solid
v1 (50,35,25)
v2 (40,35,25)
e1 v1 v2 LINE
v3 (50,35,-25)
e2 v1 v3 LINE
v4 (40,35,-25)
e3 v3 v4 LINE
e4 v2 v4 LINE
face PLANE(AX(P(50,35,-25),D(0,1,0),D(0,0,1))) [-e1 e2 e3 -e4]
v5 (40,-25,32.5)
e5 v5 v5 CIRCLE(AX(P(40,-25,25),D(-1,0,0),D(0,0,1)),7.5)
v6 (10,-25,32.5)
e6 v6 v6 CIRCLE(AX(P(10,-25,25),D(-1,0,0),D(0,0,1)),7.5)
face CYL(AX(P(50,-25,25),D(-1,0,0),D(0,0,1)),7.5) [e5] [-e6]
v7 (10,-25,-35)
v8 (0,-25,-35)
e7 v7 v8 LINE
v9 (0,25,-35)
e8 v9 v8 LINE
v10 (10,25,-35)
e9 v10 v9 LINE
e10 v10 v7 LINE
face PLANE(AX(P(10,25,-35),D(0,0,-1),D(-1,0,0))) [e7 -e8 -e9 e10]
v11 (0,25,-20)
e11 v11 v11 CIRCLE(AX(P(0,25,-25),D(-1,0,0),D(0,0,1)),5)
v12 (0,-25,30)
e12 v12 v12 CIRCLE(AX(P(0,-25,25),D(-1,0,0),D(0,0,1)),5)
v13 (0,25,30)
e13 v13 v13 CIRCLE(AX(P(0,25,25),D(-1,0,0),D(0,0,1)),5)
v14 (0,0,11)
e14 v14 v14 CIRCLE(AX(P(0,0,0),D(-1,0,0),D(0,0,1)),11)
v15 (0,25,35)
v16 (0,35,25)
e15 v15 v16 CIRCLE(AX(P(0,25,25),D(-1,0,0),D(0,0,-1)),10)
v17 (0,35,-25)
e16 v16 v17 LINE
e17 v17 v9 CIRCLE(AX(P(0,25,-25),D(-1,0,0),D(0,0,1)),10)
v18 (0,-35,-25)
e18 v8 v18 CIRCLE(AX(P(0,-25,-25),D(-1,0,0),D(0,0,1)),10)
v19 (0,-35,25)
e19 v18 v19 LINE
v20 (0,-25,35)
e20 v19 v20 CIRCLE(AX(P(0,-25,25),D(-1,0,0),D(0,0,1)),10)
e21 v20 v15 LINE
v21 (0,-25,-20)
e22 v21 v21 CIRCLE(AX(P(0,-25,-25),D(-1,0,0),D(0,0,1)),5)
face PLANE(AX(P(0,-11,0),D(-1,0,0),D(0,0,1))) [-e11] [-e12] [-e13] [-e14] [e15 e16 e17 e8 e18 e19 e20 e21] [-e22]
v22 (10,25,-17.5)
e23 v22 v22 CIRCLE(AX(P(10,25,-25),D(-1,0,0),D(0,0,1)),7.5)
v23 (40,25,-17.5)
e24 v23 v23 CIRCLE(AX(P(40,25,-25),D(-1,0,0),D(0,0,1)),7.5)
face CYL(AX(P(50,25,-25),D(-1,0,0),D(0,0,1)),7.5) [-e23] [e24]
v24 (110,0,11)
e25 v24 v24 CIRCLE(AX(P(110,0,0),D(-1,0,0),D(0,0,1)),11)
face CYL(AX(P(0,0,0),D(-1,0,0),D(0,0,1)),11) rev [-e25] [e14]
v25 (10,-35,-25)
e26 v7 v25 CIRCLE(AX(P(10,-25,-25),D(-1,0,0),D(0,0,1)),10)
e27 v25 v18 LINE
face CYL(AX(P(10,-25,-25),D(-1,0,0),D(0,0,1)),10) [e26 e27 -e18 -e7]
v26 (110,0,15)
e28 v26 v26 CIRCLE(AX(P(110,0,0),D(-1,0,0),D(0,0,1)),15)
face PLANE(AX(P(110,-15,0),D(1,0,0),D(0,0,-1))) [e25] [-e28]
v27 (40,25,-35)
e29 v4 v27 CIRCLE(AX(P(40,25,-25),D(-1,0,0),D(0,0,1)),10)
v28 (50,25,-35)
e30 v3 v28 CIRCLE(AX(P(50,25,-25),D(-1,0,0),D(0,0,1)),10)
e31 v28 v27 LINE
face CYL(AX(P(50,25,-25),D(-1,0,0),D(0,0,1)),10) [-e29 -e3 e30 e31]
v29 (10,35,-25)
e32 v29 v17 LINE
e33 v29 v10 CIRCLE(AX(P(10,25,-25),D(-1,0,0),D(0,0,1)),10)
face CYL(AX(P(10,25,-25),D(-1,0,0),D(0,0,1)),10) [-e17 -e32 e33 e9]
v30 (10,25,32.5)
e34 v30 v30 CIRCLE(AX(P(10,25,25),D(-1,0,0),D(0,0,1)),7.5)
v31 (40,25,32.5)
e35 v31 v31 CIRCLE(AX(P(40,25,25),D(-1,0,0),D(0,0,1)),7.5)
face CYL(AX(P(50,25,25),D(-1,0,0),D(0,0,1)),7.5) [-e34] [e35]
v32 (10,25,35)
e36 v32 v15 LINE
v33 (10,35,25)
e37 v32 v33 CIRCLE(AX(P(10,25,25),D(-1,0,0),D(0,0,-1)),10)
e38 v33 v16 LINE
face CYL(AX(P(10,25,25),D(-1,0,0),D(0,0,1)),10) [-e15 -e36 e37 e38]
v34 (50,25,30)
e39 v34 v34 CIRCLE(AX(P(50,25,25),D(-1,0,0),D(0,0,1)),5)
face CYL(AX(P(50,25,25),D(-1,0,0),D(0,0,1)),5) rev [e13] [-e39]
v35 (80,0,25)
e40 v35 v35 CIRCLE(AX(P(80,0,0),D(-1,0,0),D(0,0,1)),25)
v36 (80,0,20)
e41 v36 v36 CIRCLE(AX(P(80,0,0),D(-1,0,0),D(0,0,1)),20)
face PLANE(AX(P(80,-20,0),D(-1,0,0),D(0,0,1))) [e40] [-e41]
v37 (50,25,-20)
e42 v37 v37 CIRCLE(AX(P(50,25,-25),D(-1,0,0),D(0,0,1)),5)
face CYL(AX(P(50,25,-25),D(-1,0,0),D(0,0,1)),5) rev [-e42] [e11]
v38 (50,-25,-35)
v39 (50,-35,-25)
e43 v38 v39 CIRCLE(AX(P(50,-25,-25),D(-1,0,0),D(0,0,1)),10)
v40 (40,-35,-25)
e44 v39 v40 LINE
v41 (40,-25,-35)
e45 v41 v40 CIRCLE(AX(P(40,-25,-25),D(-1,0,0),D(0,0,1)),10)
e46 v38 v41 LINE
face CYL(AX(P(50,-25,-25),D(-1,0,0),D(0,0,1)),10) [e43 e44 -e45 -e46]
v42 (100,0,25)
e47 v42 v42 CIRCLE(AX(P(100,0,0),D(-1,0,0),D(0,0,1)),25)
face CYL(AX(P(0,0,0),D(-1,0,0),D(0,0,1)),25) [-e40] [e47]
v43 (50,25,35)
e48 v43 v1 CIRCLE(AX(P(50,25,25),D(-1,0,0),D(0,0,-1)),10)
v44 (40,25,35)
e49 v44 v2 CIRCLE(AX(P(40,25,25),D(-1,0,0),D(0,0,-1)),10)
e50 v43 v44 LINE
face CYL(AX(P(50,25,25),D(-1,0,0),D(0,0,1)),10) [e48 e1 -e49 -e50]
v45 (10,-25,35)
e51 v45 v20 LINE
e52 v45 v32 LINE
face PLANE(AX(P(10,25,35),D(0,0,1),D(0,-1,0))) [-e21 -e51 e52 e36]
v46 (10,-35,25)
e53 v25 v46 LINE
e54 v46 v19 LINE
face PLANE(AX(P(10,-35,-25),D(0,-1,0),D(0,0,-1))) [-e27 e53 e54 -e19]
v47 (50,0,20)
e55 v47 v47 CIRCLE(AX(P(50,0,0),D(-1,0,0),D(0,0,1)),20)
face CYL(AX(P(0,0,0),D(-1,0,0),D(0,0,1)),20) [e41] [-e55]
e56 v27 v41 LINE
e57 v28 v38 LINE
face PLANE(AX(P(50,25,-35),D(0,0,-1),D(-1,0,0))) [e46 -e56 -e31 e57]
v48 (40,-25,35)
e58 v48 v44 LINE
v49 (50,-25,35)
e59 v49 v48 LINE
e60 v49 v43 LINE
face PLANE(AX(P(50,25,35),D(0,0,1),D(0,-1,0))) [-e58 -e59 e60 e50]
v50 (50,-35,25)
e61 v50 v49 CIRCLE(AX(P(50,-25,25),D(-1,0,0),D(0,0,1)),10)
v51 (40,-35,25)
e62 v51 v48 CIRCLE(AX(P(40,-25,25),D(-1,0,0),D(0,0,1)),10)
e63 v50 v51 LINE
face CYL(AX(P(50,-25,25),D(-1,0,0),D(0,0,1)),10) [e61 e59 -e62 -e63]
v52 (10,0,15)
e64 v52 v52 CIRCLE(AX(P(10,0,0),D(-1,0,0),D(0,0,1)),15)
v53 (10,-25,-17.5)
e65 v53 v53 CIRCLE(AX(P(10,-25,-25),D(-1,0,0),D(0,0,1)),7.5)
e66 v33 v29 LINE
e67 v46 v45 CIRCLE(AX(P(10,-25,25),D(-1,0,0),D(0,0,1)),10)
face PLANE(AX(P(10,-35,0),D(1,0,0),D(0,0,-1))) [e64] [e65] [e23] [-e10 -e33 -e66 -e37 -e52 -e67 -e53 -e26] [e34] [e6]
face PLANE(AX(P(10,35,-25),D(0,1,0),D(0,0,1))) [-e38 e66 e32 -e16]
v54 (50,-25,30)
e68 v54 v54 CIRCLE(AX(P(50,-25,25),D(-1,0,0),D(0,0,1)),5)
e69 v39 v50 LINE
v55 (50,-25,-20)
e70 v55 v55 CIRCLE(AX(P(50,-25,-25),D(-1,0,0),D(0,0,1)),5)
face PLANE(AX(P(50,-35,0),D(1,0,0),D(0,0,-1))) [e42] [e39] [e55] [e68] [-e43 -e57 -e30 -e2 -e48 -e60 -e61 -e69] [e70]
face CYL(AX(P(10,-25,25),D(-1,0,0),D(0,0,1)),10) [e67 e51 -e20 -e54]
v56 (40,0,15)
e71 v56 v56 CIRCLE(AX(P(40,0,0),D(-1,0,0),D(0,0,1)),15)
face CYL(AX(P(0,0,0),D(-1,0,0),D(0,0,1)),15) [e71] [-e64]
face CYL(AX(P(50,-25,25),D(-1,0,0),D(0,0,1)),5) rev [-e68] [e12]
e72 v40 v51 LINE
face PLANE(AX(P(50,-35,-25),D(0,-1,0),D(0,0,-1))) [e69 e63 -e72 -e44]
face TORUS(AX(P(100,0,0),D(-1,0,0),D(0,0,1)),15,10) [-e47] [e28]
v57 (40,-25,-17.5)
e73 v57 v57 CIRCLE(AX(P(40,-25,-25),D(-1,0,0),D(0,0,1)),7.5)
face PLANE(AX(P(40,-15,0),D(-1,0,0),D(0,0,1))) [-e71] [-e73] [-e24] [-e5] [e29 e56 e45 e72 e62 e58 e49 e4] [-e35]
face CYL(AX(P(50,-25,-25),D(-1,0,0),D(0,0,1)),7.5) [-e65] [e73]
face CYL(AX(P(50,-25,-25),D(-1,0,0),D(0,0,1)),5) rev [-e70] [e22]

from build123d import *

# Parameters (mm, degrees)
SKETCH_2_R               = 7.5
EXTRUDE_1_DEPTH          = 10
EXTRUDE_START            = -40
SKETCH_2_3_R             = 7.5
EXTRUDE_2_DEPTH          = 10
SKETCH_3_R               = 7.5
SKETCH_3_R_2             = 5
SKETCH_3_R_3             = 11
EXTRUDE_3_DEPTH          = 50
CUT_EXTRUDE_2_DEPTH      = 121.623380818
CUT_EXTRUDE_2_DEPTH_BACK = 121.623380818
SKETCH_6_R               = 5
SKETCH_6_R_2             = 11


with BuildPart() as part:
    # Эскиз1 → Повернуть1 (revolve)
    with BuildSketch(Plane.XY):
        with BuildLine():
            Line((0, -11), (0, -35))
            Line((0, -35), (10, -35))
            Line((10, -35), (10, -15))
            Line((10, -15), (40, -15))
            Line((40, -15), (40, -35))
            Line((40, -35), (50, -35))
            Line((50, -35), (50, -20))
            Line((50, -20), (80, -20))
            Line((80, -20), (80, -25))
            Line((80, -25), (100, -25))
            ThreePointArc((100, -25), (107.071067812, -22.071067812), (110, -15))
            Line((110, -15), (110, -11))
            Line((110, -11), (0, -11))
        make_face()
    revolve(axis=Axis((0, 0, 0), (1, 0, 0)))

    # Эскиз2 → Бобышка-Вытянуть1 (add)
    with BuildSketch(Plane.ZY):
        with BuildLine():
            Line((-25, 35), (25, 35))
            ThreePointArc((25, 35), (32.071067812, 32.071067812), (35, 25))
            Line((35, 25), (35, -25))
            ThreePointArc((35, -25), (32.071067812, -32.071067812), (25, -35))
            Line((25, -35), (-25, -35))
            ThreePointArc((-25, -35), (-32.071067812, -32.071067812), (-35, -25))
            Line((-35, -25), (-35, 25))
            ThreePointArc((-35, 25), (-32.071067812, 32.071067812), (-25, 35))
        make_face()
        with Locations((25, 25)):
            Circle(SKETCH_2_R, mode=Mode.SUBTRACT)
        with Locations((-25, 25)):
            Circle(SKETCH_2_R, mode=Mode.SUBTRACT)
        with Locations((-25, -25)):
            Circle(SKETCH_2_R, mode=Mode.SUBTRACT)
        with Locations((25, -25)):
            Circle(SKETCH_2_R, mode=Mode.SUBTRACT)
    extrude(amount=-EXTRUDE_1_DEPTH)

    # Эскиз2<3> → Бобышка-Вытянуть2 (add)
    with BuildSketch(Plane.ZY.offset(EXTRUDE_START)):
        with BuildLine():
            Line((-25, 35), (25, 35))
            ThreePointArc((25, 35), (32.071067812, 32.071067812), (35, 25))
            Line((35, 25), (35, -25))
            ThreePointArc((35, -25), (32.071067812, -32.071067812), (25, -35))
            Line((25, -35), (-25, -35))
            ThreePointArc((-25, -35), (-32.071067812, -32.071067812), (-35, -25))
            Line((-35, -25), (-35, 25))
            ThreePointArc((-35, 25), (-32.071067812, 32.071067812), (-25, 35))
        make_face()
        with Locations((25, 25)):
            Circle(SKETCH_2_3_R, mode=Mode.SUBTRACT)
        with Locations((-25, 25)):
            Circle(SKETCH_2_3_R, mode=Mode.SUBTRACT)
        with Locations((-25, -25)):
            Circle(SKETCH_2_3_R, mode=Mode.SUBTRACT)
        with Locations((25, -25)):
            Circle(SKETCH_2_3_R, mode=Mode.SUBTRACT)
    extrude(amount=-EXTRUDE_2_DEPTH)

    # Эскиз3 → Бобышка-Вытянуть3 (add)
    # profile 1 of 5: a face of its own
    with BuildSketch(Plane.ZY):
        with Locations((-25, 25)):
            Circle(SKETCH_3_R)
        with Locations((-25, 25)):
            Circle(SKETCH_3_R_2, mode=Mode.SUBTRACT)
    # profile 2 of 5: a face of its own
    with BuildSketch(Plane.ZY):
        with Locations((25, 25)):
            Circle(SKETCH_3_R)
        with Locations((25, 25)):
            Circle(SKETCH_3_R_2, mode=Mode.SUBTRACT)
    # profile 3 of 5: a face of its own
    with BuildSketch(Plane.ZY):
        with Locations((-25, -25)):
            Circle(SKETCH_3_R)
        with Locations((-25, -25)):
            Circle(SKETCH_3_R_2, mode=Mode.SUBTRACT)
    # profile 4 of 5: a face of its own
    with BuildSketch(Plane.ZY):
        with Locations((25, -25)):
            Circle(SKETCH_3_R)
        with Locations((25, -25)):
            Circle(SKETCH_3_R_2, mode=Mode.SUBTRACT)
    # profile 5 of 5: a face of its own
    with BuildSketch(Plane.ZY):
        Circle(SKETCH_3_R_3)
    extrude(amount=-EXTRUDE_3_DEPTH)

    # Эскиз6 → Вырез-Вытянуть2 (cut, two sides: drawn at the far end of the back side and taken through both)
    with BuildSketch(Plane.ZY.offset(-CUT_EXTRUDE_2_DEPTH_BACK)):
        with Locations((-25, 25)):
            Circle(SKETCH_6_R)
        with Locations((-25, -25)):
            Circle(SKETCH_6_R)
        with Locations((25, 25)):
            Circle(SKETCH_6_R)
        with Locations((25, -25)):
            Circle(SKETCH_6_R)
        Circle(SKETCH_6_R_2)
    extrude(amount=CUT_EXTRUDE_2_DEPTH + CUT_EXTRUDE_2_DEPTH_BACK, mode=Mode.SUBTRACT)


solid = part.part
